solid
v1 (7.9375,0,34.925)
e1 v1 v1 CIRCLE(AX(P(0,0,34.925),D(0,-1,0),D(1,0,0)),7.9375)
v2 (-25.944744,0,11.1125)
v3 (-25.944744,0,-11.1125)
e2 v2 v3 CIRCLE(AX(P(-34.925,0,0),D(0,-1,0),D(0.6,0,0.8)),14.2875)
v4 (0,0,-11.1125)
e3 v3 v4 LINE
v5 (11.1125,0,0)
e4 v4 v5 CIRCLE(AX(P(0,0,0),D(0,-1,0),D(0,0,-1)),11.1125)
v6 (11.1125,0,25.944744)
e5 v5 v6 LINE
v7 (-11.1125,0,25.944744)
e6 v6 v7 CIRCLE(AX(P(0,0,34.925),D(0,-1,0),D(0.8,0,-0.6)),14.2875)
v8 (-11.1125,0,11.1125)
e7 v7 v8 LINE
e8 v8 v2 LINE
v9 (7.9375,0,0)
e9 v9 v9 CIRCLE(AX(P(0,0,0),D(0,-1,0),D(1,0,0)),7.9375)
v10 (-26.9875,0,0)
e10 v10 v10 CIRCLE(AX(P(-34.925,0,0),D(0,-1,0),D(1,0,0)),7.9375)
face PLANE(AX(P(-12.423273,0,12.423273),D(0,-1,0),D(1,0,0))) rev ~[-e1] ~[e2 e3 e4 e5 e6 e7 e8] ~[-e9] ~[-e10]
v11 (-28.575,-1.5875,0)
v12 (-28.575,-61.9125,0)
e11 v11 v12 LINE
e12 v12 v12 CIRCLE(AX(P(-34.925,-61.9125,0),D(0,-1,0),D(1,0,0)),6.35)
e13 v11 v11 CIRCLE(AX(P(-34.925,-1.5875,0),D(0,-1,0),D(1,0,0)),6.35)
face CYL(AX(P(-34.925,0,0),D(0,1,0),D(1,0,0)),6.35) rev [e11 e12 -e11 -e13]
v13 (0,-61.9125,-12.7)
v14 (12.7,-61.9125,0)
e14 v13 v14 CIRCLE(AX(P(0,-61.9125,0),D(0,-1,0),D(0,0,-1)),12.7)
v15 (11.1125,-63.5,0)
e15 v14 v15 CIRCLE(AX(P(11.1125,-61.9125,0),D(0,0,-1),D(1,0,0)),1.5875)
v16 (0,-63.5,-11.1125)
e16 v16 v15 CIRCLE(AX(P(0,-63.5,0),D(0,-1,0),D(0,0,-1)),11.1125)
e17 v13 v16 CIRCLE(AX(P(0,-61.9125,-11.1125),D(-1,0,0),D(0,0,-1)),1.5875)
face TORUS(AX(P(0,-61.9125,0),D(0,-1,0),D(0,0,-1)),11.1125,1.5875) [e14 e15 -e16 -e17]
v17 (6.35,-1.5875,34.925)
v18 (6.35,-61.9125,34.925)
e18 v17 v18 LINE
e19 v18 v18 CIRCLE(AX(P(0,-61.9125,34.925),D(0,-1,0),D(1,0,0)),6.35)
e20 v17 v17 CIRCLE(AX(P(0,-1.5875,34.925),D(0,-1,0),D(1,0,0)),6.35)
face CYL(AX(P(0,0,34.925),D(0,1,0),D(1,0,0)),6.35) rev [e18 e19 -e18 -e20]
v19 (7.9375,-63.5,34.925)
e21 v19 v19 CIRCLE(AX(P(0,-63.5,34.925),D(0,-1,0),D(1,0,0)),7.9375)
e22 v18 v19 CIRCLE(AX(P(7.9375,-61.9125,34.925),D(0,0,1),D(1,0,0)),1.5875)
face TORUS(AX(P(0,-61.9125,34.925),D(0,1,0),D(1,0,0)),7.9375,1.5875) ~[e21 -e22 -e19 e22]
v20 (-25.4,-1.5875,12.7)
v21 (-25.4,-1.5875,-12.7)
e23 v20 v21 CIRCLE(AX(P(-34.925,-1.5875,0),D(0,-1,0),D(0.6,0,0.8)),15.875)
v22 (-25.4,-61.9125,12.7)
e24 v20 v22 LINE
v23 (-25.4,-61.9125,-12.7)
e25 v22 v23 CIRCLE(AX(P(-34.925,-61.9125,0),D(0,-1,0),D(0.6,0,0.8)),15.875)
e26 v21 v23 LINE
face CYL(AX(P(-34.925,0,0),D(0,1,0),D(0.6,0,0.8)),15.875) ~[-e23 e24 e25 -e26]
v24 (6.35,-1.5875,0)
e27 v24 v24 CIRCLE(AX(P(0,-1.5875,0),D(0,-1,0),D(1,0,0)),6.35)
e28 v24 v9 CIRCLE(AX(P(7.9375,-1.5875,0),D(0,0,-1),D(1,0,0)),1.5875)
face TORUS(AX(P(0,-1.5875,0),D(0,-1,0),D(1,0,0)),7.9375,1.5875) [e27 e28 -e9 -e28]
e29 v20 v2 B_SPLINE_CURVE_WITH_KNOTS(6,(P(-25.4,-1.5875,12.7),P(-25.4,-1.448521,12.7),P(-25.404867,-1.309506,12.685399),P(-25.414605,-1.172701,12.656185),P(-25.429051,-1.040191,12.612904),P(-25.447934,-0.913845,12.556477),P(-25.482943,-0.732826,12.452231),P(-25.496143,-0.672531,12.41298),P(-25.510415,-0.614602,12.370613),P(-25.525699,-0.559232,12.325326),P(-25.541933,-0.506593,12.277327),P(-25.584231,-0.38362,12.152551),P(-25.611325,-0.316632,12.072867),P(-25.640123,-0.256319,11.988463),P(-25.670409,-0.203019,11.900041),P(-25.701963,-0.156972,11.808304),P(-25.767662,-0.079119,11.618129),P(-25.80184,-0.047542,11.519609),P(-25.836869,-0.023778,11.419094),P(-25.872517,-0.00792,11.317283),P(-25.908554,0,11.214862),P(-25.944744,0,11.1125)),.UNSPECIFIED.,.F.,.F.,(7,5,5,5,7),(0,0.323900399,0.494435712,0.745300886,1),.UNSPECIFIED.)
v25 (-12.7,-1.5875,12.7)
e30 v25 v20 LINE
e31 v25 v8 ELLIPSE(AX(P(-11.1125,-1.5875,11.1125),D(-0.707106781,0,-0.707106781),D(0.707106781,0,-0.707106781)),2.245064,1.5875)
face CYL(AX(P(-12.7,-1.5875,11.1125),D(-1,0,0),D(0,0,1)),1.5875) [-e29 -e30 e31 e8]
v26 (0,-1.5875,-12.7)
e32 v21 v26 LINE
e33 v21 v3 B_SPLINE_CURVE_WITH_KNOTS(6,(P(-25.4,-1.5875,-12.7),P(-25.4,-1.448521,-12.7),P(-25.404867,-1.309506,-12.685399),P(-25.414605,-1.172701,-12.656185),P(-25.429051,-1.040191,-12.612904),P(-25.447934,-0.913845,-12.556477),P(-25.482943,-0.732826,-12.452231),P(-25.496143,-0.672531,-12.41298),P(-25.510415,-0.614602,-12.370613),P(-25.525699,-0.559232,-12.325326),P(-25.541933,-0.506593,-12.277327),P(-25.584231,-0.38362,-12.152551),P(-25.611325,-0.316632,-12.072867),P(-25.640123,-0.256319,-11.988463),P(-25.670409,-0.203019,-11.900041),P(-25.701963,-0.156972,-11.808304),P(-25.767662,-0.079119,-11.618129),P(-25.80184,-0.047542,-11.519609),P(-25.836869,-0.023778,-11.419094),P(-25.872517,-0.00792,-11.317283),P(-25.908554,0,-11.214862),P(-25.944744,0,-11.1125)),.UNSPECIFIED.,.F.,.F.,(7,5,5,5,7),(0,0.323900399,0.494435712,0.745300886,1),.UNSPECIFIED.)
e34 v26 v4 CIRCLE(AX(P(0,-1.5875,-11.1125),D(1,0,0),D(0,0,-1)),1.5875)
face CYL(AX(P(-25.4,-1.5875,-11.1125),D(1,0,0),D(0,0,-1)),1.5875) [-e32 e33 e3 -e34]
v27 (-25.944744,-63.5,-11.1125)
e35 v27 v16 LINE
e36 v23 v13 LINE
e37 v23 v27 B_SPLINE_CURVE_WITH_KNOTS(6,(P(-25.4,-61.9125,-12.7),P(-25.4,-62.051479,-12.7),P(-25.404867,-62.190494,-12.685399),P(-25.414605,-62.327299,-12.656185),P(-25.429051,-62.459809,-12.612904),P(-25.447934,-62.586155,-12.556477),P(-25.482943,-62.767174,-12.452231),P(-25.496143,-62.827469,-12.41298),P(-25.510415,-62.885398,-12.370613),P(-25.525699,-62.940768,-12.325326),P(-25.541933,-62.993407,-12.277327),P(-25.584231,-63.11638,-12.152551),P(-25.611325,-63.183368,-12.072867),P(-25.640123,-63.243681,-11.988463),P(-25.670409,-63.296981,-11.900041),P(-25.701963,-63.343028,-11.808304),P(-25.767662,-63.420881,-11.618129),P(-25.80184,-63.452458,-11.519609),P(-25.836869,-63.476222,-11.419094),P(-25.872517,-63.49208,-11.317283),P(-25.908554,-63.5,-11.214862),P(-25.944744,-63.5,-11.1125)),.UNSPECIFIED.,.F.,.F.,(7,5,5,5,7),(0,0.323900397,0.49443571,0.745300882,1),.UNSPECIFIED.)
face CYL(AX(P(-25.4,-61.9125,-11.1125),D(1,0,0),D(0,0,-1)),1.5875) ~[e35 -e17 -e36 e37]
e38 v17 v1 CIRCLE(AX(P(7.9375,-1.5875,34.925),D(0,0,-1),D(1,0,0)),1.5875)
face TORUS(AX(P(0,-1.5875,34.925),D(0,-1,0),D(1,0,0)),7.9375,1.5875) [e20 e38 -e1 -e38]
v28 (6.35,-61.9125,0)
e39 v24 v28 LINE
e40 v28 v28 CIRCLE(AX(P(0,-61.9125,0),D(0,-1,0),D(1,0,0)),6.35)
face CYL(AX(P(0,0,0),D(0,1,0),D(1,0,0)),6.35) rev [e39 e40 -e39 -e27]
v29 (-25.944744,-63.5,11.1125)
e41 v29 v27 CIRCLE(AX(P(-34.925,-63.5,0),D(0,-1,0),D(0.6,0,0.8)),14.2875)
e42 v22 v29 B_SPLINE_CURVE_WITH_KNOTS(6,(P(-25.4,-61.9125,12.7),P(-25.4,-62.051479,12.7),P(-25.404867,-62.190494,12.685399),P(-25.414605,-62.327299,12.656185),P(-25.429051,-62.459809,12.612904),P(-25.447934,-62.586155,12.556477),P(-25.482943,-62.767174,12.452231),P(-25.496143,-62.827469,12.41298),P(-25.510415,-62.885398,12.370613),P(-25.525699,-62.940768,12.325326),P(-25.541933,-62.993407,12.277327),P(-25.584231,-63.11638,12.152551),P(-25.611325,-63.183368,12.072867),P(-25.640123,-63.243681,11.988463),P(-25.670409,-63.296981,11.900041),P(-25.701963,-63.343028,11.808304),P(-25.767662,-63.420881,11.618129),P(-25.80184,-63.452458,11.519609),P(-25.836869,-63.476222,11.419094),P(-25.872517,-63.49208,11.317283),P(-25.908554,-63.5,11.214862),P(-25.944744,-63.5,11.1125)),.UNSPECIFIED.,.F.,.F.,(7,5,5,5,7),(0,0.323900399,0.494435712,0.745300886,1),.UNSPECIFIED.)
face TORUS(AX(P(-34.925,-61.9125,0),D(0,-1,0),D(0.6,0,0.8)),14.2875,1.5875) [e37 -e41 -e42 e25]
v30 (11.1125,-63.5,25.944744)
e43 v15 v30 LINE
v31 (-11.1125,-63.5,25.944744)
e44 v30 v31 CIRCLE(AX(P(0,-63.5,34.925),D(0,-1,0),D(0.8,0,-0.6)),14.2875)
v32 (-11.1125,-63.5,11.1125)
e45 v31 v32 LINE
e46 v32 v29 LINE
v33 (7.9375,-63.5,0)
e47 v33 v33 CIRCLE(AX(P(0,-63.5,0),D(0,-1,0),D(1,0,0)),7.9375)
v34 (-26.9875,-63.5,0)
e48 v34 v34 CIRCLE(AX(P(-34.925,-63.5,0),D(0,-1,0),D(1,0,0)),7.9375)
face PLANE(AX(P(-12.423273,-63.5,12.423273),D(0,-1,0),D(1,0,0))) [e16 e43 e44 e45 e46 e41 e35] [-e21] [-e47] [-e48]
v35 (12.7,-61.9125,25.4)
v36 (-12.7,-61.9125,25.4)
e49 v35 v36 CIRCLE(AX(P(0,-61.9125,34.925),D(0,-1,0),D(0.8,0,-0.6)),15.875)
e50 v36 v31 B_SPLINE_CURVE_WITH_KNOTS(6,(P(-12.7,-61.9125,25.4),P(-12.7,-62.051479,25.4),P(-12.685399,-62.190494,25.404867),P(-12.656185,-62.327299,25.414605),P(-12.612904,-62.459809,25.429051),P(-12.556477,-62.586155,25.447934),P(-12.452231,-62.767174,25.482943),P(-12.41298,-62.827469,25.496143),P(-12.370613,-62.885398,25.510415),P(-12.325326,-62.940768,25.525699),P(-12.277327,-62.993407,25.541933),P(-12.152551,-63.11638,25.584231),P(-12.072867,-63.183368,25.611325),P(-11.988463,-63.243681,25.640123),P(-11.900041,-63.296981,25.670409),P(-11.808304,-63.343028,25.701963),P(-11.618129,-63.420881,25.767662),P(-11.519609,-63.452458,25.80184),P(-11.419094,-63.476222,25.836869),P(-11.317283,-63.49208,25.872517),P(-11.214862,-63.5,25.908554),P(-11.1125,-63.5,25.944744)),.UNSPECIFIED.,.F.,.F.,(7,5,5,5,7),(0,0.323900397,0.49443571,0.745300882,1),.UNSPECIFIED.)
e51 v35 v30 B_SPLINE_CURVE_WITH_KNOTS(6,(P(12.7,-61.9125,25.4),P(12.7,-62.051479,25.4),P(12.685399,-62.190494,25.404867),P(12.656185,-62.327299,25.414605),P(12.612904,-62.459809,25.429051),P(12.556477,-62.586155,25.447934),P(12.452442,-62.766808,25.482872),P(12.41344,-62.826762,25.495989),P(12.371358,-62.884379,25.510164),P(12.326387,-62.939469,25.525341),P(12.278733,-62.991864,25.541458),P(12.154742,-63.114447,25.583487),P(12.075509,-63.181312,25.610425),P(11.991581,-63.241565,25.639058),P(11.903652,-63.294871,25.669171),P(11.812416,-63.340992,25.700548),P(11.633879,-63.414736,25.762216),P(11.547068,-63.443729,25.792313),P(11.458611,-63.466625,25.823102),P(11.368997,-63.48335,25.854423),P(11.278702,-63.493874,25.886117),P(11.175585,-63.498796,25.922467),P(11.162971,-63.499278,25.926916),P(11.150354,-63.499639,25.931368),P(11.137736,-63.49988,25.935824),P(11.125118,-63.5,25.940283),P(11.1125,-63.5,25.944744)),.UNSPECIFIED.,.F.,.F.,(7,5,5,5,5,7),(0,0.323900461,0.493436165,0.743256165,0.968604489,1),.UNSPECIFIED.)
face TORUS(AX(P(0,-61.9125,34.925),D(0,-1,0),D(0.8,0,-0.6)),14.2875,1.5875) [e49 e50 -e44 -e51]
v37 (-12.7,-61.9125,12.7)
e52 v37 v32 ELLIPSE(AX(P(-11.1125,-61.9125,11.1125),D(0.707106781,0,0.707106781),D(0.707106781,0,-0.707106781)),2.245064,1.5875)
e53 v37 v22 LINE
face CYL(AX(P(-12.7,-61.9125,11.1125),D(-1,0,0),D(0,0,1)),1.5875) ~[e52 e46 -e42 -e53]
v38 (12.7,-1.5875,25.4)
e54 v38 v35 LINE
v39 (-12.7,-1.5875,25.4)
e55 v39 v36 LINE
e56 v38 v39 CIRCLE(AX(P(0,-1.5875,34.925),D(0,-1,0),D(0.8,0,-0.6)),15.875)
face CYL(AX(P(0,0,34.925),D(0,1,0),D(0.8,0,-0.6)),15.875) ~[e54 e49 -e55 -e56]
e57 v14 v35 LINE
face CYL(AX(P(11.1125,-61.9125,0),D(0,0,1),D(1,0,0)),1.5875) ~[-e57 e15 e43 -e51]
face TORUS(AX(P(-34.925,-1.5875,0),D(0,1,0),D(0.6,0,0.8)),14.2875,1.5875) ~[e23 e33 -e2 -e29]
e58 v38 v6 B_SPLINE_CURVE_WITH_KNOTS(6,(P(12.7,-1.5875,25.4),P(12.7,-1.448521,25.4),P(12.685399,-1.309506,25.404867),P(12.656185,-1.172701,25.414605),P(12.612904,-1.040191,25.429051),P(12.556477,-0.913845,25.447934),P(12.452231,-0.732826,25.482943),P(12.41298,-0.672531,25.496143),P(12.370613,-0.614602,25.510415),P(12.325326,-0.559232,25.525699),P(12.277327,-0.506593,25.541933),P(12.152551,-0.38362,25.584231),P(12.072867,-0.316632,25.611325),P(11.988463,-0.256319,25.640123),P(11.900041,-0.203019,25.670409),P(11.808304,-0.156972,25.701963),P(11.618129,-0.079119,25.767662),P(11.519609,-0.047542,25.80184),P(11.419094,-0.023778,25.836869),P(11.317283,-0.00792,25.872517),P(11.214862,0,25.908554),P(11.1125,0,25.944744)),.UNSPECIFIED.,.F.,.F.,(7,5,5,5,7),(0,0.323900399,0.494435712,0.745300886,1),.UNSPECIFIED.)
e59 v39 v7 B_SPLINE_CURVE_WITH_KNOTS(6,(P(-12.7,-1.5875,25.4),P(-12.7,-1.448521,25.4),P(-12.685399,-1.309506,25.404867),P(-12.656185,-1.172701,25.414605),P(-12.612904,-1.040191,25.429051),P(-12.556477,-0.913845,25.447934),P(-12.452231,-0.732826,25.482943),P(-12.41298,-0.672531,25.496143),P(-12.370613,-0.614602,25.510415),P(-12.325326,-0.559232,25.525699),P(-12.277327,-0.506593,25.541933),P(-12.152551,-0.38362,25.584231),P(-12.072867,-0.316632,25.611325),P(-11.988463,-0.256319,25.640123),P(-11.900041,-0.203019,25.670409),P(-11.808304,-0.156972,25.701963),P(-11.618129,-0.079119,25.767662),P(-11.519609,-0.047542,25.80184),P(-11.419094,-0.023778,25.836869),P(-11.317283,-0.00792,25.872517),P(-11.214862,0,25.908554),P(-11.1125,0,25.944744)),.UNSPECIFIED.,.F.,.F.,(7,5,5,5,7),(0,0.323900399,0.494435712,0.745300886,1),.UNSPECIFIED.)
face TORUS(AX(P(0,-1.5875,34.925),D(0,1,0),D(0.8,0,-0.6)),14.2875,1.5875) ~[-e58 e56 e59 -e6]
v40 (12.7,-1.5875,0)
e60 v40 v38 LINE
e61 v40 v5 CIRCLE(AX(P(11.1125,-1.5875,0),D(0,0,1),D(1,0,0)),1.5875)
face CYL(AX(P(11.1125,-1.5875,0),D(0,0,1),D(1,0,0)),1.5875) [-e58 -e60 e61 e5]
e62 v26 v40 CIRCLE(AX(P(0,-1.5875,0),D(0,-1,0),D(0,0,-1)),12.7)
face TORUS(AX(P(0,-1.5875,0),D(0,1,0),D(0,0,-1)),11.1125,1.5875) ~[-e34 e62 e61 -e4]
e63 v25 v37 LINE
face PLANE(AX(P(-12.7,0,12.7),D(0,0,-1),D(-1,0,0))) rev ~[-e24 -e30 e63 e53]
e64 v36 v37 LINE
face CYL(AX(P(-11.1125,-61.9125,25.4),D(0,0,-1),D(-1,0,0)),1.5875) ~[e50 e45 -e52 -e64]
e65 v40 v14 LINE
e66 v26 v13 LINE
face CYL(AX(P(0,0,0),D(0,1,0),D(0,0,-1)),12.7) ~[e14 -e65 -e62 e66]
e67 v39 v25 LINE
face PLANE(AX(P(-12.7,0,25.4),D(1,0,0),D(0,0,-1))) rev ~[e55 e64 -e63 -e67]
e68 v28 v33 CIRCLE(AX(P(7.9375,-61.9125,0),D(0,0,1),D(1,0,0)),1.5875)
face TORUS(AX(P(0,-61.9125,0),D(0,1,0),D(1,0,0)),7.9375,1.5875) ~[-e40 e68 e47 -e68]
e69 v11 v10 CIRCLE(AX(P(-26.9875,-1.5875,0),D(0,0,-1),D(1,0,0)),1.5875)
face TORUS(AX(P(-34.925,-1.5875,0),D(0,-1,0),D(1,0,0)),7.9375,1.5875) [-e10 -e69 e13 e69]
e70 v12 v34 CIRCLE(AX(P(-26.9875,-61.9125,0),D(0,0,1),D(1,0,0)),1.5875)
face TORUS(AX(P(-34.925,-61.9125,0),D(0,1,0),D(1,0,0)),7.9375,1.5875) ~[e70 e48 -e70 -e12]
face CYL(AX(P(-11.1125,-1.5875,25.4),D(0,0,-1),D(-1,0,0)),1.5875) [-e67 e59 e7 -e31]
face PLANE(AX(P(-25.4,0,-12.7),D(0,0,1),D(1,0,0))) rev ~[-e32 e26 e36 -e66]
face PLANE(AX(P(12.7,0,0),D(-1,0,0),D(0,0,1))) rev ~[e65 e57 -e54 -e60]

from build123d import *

# Parameters (mm, degrees)
F0_R     = 6.35
F1_DEPTH = 63.5
F2_R     = 1.5875


# Not quite as in the source:
# - a feature names something its author has since deleted; it is built from what else it names


with BuildPart() as f1:
    # F0 (on Front) → F1 (new body)
    with BuildSketch(Plane.XZ):
        with BuildLine():
            Line((-12.7, 12.7), (-25.4, 12.7))
            ThreePointArc((-25.4, 12.7), (-50.8, 0), (-25.4, -12.7))
            Line((-25.4, -12.7), (0, -12.7))
            ThreePointArc((0, -12.7), (8.9802561211, -8.9802561211), (12.7, 0))
            Line((12.7, 0), (12.7, 25.4))
            ThreePointArc((12.7, 25.4), (0, 50.8), (-12.7, 25.4))
            Line((-12.7, 25.4), (-12.7, 12.7))
        make_face()
        with Locations((-34.925, 0)):
            Circle(F0_R, mode=Mode.SUBTRACT)
        Circle(F0_R, mode=Mode.SUBTRACT)
        with Locations((0, 34.925)):
            Circle(F0_R, mode=Mode.SUBTRACT)
    extrude(amount=F1_DEPTH)

    # F2
    f2_edges = [f1.edges().sort_by_distance(p)[0] for p in [
        (-12.7, -63.5, 19.05),
        (-19.05, -63.5, 12.7),
        (-50.8, -63.5, 0),
        (-12.7, -63.5, -12.7),
        (8.980256, -63.5, -8.980256),
        (12.7, -63.5, 12.7),
        (0, -63.5, 50.8),
        (-41.275, -63.5, 0),
        (-6.35, -63.5, 0),
        (-6.35, -63.5, 34.925),
        (-12.7, 0, 19.05),
        (-19.05, 0, 12.7),
        (-50.8, 0, 0),
        (-12.7, 0, -12.7),
        (8.980256, 0, -8.980256),
        (12.7, 0, 12.7),
        (0, 0, 50.8),
        (-41.275, 0, 0),
        (-6.35, 0, 0),
        (-6.35, 0, 34.925),
    ]]
    fillet(f2_edges, radius=F2_R)


solid = f1.part
